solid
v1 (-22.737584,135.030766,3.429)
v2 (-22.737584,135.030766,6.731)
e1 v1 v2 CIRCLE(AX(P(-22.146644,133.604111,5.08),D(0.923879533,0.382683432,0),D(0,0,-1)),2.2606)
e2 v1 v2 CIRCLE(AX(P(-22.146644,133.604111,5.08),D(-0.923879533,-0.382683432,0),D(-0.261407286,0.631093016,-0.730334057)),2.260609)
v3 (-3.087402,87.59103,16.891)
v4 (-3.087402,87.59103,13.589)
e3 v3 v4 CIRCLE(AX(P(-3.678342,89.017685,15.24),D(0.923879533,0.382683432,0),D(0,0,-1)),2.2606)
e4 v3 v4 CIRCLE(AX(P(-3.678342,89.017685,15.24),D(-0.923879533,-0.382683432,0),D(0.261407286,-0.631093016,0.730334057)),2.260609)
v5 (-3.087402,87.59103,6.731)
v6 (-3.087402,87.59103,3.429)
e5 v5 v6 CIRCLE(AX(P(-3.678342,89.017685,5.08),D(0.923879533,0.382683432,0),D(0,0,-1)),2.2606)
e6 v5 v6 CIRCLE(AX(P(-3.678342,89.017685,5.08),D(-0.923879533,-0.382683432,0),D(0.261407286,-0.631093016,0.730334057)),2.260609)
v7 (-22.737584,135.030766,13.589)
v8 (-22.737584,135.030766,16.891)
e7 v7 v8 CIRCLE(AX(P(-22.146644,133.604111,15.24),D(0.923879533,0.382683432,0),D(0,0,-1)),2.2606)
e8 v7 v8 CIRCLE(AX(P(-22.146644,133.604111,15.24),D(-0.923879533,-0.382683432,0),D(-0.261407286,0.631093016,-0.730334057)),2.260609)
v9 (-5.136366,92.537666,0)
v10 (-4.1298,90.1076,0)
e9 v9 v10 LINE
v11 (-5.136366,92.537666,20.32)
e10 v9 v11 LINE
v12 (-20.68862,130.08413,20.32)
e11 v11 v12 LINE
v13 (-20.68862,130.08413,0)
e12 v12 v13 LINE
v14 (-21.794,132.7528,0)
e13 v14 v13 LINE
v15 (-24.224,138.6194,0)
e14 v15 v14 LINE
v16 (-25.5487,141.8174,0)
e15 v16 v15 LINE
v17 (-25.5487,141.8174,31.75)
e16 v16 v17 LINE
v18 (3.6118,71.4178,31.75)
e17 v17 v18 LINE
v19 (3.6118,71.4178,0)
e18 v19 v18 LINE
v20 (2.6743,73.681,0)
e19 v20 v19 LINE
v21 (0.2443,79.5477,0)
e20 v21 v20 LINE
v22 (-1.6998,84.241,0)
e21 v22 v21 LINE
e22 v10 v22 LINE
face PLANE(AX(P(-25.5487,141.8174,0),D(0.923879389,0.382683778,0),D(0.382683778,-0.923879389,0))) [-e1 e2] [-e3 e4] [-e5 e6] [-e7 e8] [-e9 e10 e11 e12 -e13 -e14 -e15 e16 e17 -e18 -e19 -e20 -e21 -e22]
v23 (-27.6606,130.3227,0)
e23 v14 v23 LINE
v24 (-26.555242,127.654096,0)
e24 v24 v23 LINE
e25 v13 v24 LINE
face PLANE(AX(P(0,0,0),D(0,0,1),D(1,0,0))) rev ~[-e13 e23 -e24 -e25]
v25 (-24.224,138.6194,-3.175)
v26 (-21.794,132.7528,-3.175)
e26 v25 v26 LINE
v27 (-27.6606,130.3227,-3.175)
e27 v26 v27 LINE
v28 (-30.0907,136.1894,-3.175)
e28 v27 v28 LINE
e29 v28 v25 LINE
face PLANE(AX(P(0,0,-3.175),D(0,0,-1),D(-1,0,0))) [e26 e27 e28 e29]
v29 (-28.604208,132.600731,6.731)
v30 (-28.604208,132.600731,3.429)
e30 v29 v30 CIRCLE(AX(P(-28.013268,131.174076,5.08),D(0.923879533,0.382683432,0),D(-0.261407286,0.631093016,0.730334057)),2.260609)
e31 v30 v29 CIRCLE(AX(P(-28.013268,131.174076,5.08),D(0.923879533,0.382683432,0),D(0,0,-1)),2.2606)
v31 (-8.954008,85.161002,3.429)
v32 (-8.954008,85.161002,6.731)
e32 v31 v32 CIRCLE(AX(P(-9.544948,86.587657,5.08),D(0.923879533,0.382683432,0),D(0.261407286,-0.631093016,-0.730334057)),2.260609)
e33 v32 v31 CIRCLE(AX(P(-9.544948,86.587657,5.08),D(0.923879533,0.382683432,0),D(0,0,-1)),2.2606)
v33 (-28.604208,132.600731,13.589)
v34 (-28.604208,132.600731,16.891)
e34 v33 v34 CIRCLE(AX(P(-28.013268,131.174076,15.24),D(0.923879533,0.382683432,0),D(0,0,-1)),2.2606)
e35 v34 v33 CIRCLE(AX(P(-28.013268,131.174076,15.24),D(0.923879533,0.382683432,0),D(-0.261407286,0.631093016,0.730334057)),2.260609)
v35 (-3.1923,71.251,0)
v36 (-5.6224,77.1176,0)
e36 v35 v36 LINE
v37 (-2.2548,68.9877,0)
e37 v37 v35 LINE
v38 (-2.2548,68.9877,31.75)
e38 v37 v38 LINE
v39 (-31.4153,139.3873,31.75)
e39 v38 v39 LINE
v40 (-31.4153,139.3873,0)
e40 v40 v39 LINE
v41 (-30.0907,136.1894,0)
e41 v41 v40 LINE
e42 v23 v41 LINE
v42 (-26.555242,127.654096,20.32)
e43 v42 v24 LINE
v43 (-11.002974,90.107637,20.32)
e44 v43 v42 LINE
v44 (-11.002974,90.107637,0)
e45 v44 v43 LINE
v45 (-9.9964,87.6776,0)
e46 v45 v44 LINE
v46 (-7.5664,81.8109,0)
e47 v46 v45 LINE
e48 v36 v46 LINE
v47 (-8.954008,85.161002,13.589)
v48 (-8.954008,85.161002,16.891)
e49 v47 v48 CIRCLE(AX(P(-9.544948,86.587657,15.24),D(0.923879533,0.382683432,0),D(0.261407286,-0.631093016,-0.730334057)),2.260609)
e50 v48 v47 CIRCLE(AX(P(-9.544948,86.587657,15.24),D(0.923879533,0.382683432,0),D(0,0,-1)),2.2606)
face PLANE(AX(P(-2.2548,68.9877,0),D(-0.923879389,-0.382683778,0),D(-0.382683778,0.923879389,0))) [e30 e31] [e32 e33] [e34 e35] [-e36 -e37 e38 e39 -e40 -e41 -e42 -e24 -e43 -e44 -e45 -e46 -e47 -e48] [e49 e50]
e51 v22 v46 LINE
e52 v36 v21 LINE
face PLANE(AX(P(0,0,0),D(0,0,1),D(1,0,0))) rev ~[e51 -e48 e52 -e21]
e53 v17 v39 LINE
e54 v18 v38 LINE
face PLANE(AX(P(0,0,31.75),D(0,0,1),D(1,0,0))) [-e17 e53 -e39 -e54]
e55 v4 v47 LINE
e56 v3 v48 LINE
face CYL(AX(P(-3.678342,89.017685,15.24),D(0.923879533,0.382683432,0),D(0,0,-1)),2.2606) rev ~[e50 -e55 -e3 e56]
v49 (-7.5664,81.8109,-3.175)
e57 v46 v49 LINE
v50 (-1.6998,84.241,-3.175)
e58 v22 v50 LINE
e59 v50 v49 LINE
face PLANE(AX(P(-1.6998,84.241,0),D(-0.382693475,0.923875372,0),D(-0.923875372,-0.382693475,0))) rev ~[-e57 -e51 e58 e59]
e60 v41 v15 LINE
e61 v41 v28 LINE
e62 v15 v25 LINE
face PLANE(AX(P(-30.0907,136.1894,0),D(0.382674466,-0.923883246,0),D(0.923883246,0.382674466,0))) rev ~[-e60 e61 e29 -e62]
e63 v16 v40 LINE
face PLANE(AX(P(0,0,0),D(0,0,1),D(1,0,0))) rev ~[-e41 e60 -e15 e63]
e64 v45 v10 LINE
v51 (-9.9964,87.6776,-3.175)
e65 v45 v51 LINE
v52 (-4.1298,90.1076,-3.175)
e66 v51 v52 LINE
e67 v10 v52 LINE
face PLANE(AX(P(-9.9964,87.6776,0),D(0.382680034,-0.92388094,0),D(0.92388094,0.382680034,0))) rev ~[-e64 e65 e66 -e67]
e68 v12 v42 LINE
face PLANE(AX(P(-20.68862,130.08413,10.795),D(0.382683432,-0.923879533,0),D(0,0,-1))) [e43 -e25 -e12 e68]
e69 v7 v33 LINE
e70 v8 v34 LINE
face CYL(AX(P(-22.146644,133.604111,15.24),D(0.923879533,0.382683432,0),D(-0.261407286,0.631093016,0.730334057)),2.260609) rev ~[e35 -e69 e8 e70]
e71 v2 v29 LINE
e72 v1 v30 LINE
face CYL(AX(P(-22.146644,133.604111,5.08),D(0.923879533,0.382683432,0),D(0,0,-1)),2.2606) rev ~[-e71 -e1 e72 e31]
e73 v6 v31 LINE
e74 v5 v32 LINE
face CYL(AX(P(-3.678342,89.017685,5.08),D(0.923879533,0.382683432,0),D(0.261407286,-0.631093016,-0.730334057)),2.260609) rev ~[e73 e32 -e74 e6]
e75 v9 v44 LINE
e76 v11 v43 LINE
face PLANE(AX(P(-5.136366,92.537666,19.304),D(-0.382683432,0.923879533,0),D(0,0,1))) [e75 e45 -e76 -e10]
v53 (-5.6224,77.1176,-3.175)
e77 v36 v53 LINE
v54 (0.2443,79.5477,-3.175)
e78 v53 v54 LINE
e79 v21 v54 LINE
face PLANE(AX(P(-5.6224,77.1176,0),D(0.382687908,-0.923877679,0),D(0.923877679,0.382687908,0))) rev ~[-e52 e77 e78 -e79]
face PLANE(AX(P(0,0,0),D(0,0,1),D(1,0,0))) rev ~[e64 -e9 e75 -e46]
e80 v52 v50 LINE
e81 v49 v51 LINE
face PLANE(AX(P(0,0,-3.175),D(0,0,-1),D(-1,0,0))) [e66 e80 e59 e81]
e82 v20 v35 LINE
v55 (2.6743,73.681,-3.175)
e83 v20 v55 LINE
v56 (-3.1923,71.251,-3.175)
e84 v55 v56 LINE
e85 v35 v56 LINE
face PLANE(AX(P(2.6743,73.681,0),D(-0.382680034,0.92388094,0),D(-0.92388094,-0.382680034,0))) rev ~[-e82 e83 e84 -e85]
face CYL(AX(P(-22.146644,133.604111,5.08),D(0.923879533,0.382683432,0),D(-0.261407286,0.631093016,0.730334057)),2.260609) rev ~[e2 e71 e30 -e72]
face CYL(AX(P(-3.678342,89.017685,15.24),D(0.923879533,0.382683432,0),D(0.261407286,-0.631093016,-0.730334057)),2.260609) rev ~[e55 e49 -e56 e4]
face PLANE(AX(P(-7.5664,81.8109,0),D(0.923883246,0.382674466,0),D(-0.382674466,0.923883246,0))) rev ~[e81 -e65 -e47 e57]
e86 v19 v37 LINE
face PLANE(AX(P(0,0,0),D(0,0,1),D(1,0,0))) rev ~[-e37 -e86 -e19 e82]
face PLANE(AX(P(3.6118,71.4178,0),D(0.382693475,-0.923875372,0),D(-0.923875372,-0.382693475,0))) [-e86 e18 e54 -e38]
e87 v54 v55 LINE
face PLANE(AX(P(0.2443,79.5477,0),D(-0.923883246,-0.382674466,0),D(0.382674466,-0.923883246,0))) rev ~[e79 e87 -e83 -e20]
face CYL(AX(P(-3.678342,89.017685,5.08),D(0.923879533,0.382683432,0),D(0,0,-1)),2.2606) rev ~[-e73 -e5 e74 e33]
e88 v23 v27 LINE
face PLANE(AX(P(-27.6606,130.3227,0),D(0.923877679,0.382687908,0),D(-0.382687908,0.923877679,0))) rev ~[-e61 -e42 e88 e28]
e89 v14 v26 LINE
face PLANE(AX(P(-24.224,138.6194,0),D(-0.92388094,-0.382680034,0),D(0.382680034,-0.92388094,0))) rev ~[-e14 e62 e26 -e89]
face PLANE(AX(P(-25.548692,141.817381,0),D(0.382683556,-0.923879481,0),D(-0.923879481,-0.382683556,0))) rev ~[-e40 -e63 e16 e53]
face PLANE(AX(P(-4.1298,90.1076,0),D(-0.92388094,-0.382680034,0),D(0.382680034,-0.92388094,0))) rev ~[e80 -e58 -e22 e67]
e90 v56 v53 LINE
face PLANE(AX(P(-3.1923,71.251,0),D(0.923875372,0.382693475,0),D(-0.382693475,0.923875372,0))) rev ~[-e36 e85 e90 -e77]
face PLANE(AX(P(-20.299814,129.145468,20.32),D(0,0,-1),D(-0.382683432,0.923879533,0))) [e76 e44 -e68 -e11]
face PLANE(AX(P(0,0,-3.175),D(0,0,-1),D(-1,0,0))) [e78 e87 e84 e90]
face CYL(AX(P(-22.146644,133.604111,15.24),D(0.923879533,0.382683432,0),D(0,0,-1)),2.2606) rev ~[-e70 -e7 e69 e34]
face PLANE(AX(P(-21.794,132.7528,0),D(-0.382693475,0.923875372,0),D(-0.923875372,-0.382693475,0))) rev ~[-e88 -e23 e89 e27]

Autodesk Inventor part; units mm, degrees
ref_plane "YZ Plane" through (0, 0, 0) normal (1, 0, 0) x (0, 1, 0)
ref_plane "XZ Plane" through (0, 0, 0) normal (0, 1, 0) x (-1, 0, 0)
ref_plane "XY Plane" through (0, 0, 0) normal (0, 0, 1) x (1, 0, 0)
ref_plane "Work Plane1" through (0, 0, 0) normal (0, 0, 1) x (1, 0, 0)
sketch "Sketch1" plane through (0, 0, 0) normal (0, 0, 1) x (1, 0, 0)
  line L0 (0, 152.4) -> (-45.5982, 133.5126) projected
  line L1 (-31.4153, 139.3873) -> (-25.5487, 141.8174)
  line L2 (-25.5487, 141.8174) -> (3.6118, 71.4178)
  line L3 (3.6118, 71.4178) -> (-2.2548, 68.9877)
  line L4 (-2.2548, 68.9877) -> (-31.4153, 139.3873)
  point P0 (0, 0)
  dimension "d0" = 6.35
  dimension "d1" = 76.2
extrude "Extrusion1" add sketch "Sketch1" along normal blind 31.75
sketch "Sketch2" plane through (-25.5487, 141.8174, 31.75) normal (0.9238795, 0.3826834, 0) x (0, 0, -1)
  line L0 (11.43, -52.324) -> (11.43, -13.716) projected
  line L1 (30.734, -53.34) -> (12.446, -53.34) projected
  line L2 (12.446, -12.7) -> (20.955, -12.7) projected
  line L3 (11.43, -53.34) -> (11.43, -12.7)
  line L4 (11.43, -12.7) -> (31.75, -12.7)
  line L5 (31.75, -12.7) -> (31.75, -53.34)
  line L6 (31.75, -53.34) -> (11.43, -53.34)
  point P0 (31.75, -140.7992)
extrude "Extrusion2" cut sketch "Sketch2" against normal through all
sketch "Sketch3" plane through (-25.5487, 141.8174, 31.75) normal (0.9238795, 0.3826834, 0) x (0, 0, -1)
  arc A0 (18.161, -58.6942) -> (14.859, -58.6942) centre (16.51, -57.15) ccw projected
  arc A1 (28.321, -58.6942) -> (25.019, -58.6942) centre (26.67, -57.15) ccw projected
  arc A2 (14.859, -7.3458) -> (18.161, -7.3458) centre (16.51, -8.89) ccw projected
  arc A3 (25.019, -7.3458) -> (28.321, -7.3458) centre (26.67, -8.89) ccw projected
  circle A4 centre (16.51, -57.15) radius 2.2606
  circle A5 centre (26.67, -57.15) radius 2.2606
  circle A6 centre (16.51, -8.89) radius 2.2606
  circle A7 centre (26.67, -8.89) radius 2.2606
  point P0 (31.75, -140.7992)
extrude "Extrusion3" cut sketch "Sketch3" against normal through all
sketch "Sketch4" plane through (0, 0, 0) normal (0, 0, -1) x (-1, 0, 0)
  line L0 (11.003, 90.1076) -> (5.1363, 92.5377) construction
  line L1 (5.1363, 92.5377) -> (-3.6118, 71.4178) construction
  line L2 (-3.6118, 71.4178) -> (2.2548, 68.9877) construction
  line L3 (2.2548, 68.9877) -> (11.003, 90.1076) construction
  line L4 (20.6886, 130.0841) -> (26.5552, 127.6541) construction
  line L5 (26.5552, 127.6541) -> (31.4153, 139.3873) construction
  line L6 (31.4153, 139.3873) -> (25.5487, 141.8174) construction
  line L7 (25.5487, 141.8174) -> (20.6886, 130.0841) construction
  line L8 (24.224, 138.6194) -> (21.794, 132.7528)
  line L9 (21.794, 132.7528) -> (27.6606, 130.3227)
  line L10 (27.6606, 130.3227) -> (30.0907, 136.1894)
  line L11 (30.0907, 136.1894) -> (24.224, 138.6194)
  line L12 (4.1298, 90.1076) -> (1.6998, 84.241)
  line L13 (1.6998, 84.241) -> (7.5664, 81.8109)
  line L14 (7.5664, 81.8109) -> (9.9964, 87.6776)
  line L15 (9.9964, 87.6776) -> (4.1298, 90.1076)
  line L16 (-0.2443, 79.5477) -> (-2.6743, 73.681)
  line L17 (-2.6743, 73.681) -> (3.1923, 71.251)
  line L18 (3.1923, 71.251) -> (5.6224, 77.1176)
  line L19 (5.6224, 77.1176) -> (-0.2443, 79.5477)
  point P0 (0, 0)
  dimension "d8" = 6.35
  dimension "d9" = 6.35
  dimension "d10" = 6.35
  dimension "d11" = 6.35
  dimension "d12" = 6.35
extrude "Extrusion4" add sketch "Sketch4" along normal blind 3.175
properties part number "servoMountPlate"
